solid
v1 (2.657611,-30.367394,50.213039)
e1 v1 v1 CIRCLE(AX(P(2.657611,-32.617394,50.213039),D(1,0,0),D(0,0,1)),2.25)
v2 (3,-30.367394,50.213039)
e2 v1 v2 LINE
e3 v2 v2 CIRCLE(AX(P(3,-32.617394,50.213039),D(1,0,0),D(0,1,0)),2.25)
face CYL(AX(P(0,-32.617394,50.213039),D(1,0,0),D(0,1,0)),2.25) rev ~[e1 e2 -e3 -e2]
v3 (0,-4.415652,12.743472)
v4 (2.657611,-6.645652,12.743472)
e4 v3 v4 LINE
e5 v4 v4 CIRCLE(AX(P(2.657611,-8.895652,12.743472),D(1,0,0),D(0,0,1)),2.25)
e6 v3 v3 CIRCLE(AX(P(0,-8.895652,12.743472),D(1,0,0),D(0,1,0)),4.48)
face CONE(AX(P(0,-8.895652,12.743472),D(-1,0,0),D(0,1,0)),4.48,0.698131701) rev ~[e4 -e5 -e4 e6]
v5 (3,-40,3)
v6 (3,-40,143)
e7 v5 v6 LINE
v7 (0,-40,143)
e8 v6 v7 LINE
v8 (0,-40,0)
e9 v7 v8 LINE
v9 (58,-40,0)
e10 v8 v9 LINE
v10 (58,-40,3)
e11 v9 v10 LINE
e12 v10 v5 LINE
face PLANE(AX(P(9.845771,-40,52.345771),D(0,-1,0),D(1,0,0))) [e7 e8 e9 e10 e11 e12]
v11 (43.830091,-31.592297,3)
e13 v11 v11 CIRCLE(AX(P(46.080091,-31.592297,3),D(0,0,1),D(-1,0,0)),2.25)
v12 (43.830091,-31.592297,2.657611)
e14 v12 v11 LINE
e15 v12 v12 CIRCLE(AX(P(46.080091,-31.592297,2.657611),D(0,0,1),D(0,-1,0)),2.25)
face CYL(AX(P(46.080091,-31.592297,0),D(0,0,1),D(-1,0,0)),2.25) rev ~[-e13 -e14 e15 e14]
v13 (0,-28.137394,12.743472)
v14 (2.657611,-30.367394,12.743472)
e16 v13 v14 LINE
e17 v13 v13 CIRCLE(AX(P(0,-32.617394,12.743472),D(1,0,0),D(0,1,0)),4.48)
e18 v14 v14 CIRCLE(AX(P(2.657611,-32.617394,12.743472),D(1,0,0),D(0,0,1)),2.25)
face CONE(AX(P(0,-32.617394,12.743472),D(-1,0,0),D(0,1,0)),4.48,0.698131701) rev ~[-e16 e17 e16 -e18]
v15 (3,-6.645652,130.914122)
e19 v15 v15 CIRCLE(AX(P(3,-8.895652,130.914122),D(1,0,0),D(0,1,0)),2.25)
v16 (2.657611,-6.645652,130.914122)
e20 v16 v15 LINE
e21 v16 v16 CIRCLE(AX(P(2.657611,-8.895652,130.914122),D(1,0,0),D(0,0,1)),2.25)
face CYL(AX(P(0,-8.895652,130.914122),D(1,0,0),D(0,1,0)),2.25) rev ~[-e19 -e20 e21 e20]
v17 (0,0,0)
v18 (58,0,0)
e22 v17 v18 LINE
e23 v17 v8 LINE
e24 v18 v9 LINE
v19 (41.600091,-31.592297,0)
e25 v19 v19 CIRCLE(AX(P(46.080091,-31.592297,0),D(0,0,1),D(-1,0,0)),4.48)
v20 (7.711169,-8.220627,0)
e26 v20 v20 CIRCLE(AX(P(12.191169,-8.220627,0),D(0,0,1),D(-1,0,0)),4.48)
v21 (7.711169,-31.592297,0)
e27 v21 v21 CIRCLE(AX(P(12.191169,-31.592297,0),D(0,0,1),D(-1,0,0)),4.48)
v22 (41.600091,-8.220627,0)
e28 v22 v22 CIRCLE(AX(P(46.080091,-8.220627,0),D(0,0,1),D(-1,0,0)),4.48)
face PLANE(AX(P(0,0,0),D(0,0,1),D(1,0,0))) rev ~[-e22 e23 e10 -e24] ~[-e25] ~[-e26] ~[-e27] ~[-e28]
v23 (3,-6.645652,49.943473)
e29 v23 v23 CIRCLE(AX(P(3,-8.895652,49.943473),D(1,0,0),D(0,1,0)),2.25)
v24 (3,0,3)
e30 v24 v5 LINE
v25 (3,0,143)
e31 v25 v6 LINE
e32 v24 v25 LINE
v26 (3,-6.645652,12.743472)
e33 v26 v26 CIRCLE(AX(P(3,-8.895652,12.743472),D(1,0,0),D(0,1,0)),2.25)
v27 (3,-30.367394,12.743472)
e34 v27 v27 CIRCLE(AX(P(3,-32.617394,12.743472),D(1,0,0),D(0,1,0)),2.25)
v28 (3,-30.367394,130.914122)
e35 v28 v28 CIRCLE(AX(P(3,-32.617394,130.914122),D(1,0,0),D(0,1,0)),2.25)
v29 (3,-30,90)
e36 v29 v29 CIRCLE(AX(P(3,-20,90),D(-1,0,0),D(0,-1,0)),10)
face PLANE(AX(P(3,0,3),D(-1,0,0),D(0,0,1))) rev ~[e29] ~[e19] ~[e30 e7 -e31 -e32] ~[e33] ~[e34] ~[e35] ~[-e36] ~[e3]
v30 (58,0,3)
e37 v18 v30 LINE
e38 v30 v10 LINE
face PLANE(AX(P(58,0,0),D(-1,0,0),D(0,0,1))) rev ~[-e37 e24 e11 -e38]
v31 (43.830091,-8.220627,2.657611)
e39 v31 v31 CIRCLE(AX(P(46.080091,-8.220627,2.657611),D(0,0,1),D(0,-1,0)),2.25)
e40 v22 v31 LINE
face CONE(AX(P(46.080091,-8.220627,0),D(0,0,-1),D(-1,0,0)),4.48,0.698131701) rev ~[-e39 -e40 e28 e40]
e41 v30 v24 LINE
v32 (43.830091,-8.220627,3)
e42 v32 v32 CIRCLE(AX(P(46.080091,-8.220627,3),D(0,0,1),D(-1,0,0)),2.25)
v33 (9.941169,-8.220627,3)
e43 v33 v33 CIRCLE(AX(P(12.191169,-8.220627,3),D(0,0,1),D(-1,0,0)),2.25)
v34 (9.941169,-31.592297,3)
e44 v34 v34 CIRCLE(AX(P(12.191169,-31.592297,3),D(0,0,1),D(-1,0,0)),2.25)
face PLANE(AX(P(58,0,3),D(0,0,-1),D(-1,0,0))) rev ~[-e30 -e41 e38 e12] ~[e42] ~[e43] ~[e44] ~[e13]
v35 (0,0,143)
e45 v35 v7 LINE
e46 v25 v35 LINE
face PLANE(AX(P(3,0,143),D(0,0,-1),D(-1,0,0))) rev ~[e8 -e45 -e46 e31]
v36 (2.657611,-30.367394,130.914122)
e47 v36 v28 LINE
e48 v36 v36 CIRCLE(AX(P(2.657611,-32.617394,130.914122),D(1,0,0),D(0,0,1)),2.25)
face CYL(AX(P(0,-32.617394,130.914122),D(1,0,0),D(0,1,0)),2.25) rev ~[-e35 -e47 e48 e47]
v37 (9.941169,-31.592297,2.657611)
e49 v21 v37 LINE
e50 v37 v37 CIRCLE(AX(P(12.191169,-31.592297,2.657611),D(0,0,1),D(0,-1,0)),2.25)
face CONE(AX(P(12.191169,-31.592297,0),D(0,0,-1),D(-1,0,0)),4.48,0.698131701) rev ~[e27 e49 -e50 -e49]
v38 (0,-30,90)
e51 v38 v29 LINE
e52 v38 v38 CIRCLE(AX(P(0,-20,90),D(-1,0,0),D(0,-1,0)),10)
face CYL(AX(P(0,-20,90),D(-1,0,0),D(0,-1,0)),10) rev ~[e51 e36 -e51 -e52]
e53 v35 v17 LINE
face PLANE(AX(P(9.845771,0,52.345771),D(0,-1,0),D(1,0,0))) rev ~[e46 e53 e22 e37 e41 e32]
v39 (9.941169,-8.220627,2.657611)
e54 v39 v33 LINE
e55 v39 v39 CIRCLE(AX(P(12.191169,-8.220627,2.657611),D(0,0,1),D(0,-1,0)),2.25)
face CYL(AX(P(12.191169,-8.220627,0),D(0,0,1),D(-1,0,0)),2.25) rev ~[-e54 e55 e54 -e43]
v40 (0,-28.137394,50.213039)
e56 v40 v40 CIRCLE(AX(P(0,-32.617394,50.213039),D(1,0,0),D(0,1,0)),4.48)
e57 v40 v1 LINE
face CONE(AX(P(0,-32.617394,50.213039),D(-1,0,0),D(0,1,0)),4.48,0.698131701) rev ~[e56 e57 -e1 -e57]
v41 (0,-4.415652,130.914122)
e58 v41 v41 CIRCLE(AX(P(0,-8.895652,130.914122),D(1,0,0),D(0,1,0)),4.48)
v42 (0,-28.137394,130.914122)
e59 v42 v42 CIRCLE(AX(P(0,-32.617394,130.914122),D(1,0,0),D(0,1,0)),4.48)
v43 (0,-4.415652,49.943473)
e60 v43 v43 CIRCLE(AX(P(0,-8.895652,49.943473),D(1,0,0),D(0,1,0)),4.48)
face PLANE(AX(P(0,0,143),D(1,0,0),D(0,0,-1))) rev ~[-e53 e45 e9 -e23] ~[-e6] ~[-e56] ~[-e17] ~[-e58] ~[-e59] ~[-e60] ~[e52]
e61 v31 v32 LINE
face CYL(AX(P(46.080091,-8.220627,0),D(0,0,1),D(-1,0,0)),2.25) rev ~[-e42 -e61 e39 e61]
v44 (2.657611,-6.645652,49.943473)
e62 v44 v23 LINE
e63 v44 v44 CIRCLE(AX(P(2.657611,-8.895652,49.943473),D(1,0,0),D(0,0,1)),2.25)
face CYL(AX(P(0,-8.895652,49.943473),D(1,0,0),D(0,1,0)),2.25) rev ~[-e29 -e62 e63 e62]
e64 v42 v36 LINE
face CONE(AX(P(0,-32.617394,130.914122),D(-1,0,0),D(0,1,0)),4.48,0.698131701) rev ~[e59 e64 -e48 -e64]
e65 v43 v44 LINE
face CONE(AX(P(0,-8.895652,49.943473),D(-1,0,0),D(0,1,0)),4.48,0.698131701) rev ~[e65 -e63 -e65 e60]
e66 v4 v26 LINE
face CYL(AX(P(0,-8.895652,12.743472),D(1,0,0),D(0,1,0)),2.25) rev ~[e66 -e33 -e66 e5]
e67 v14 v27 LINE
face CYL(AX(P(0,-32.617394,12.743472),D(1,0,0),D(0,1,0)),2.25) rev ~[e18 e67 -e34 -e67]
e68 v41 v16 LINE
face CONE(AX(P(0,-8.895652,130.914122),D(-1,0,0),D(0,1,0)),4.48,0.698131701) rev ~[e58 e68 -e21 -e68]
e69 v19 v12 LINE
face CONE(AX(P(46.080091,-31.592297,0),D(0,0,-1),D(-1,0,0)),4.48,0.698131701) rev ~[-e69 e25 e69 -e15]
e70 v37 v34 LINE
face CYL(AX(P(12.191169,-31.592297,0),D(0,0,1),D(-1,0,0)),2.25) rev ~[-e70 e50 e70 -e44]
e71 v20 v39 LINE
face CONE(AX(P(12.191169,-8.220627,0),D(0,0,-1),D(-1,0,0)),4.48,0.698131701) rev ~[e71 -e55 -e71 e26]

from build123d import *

# Parameters (mm, degrees)
F1_DEPTH       = 40
F3_R           = 10
F4_DEPTH       = 58.001
F6_D           = 4.5
F6_CSINK_D     = 8.96
F6_CSINK_ANGLE = 80
F7_D           = 4.5
F7_CSINK_D     = 8.96
F7_CSINK_ANGLE = 80


# Not quite as in the source:
# - a feature names something its author has since deleted; it is built from what else it names


with BuildPart() as f1:
    # F0 (on Front) → F1 (new body)
    with BuildSketch(Plane.XZ):
        Polygon((3, 143), (0, 143), (0, 0), (58, 0), (58, 3), (3, 3), align=None)
    extrude(amount=F1_DEPTH)

    # F3 (on face) → F4 (cut, through all)
    with BuildSketch(Plane(origin=(0, 0, 0), x_dir=(0, -1, 0), z_dir=(-1, 0, 0))):
        with Locations((20, 90)):
            Circle(F3_R)
    extrude(amount=-F4_DEPTH, mode=Mode.SUBTRACT)

    # F6 (through all)
    with Locations(Plane(origin=(0, 0, 0), x_dir=(0, -1, 0), z_dir=(-1, 0, 0))):
        with Locations((32.6173938811, 50.2130389214), (32.6173938811, 12.7434721217), (8.8956523687, 12.7434721217), (8.8956523687, 49.9434731901), (32.6173938811, 130.9141218662), (8.8956523687, 130.9141218662)):
            CounterSinkHole(F6_D / 2, F6_CSINK_D / 2, counter_sink_angle=F6_CSINK_ANGLE)

    # F7 (through all)
    with Locations(Plane(origin=(0, 0, 0), x_dir=(1, 0, 0), z_dir=(0, 0, -1))):
        with Locations((46.0800911891, 8.2206267661), (12.191168997, 8.2206267661), (12.191168997, 31.5922972435), (46.0800911891, 31.5922972435)):
            CounterSinkHole(F7_D / 2, F7_CSINK_D / 2, counter_sink_angle=F7_CSINK_ANGLE)


solid = f1.part
